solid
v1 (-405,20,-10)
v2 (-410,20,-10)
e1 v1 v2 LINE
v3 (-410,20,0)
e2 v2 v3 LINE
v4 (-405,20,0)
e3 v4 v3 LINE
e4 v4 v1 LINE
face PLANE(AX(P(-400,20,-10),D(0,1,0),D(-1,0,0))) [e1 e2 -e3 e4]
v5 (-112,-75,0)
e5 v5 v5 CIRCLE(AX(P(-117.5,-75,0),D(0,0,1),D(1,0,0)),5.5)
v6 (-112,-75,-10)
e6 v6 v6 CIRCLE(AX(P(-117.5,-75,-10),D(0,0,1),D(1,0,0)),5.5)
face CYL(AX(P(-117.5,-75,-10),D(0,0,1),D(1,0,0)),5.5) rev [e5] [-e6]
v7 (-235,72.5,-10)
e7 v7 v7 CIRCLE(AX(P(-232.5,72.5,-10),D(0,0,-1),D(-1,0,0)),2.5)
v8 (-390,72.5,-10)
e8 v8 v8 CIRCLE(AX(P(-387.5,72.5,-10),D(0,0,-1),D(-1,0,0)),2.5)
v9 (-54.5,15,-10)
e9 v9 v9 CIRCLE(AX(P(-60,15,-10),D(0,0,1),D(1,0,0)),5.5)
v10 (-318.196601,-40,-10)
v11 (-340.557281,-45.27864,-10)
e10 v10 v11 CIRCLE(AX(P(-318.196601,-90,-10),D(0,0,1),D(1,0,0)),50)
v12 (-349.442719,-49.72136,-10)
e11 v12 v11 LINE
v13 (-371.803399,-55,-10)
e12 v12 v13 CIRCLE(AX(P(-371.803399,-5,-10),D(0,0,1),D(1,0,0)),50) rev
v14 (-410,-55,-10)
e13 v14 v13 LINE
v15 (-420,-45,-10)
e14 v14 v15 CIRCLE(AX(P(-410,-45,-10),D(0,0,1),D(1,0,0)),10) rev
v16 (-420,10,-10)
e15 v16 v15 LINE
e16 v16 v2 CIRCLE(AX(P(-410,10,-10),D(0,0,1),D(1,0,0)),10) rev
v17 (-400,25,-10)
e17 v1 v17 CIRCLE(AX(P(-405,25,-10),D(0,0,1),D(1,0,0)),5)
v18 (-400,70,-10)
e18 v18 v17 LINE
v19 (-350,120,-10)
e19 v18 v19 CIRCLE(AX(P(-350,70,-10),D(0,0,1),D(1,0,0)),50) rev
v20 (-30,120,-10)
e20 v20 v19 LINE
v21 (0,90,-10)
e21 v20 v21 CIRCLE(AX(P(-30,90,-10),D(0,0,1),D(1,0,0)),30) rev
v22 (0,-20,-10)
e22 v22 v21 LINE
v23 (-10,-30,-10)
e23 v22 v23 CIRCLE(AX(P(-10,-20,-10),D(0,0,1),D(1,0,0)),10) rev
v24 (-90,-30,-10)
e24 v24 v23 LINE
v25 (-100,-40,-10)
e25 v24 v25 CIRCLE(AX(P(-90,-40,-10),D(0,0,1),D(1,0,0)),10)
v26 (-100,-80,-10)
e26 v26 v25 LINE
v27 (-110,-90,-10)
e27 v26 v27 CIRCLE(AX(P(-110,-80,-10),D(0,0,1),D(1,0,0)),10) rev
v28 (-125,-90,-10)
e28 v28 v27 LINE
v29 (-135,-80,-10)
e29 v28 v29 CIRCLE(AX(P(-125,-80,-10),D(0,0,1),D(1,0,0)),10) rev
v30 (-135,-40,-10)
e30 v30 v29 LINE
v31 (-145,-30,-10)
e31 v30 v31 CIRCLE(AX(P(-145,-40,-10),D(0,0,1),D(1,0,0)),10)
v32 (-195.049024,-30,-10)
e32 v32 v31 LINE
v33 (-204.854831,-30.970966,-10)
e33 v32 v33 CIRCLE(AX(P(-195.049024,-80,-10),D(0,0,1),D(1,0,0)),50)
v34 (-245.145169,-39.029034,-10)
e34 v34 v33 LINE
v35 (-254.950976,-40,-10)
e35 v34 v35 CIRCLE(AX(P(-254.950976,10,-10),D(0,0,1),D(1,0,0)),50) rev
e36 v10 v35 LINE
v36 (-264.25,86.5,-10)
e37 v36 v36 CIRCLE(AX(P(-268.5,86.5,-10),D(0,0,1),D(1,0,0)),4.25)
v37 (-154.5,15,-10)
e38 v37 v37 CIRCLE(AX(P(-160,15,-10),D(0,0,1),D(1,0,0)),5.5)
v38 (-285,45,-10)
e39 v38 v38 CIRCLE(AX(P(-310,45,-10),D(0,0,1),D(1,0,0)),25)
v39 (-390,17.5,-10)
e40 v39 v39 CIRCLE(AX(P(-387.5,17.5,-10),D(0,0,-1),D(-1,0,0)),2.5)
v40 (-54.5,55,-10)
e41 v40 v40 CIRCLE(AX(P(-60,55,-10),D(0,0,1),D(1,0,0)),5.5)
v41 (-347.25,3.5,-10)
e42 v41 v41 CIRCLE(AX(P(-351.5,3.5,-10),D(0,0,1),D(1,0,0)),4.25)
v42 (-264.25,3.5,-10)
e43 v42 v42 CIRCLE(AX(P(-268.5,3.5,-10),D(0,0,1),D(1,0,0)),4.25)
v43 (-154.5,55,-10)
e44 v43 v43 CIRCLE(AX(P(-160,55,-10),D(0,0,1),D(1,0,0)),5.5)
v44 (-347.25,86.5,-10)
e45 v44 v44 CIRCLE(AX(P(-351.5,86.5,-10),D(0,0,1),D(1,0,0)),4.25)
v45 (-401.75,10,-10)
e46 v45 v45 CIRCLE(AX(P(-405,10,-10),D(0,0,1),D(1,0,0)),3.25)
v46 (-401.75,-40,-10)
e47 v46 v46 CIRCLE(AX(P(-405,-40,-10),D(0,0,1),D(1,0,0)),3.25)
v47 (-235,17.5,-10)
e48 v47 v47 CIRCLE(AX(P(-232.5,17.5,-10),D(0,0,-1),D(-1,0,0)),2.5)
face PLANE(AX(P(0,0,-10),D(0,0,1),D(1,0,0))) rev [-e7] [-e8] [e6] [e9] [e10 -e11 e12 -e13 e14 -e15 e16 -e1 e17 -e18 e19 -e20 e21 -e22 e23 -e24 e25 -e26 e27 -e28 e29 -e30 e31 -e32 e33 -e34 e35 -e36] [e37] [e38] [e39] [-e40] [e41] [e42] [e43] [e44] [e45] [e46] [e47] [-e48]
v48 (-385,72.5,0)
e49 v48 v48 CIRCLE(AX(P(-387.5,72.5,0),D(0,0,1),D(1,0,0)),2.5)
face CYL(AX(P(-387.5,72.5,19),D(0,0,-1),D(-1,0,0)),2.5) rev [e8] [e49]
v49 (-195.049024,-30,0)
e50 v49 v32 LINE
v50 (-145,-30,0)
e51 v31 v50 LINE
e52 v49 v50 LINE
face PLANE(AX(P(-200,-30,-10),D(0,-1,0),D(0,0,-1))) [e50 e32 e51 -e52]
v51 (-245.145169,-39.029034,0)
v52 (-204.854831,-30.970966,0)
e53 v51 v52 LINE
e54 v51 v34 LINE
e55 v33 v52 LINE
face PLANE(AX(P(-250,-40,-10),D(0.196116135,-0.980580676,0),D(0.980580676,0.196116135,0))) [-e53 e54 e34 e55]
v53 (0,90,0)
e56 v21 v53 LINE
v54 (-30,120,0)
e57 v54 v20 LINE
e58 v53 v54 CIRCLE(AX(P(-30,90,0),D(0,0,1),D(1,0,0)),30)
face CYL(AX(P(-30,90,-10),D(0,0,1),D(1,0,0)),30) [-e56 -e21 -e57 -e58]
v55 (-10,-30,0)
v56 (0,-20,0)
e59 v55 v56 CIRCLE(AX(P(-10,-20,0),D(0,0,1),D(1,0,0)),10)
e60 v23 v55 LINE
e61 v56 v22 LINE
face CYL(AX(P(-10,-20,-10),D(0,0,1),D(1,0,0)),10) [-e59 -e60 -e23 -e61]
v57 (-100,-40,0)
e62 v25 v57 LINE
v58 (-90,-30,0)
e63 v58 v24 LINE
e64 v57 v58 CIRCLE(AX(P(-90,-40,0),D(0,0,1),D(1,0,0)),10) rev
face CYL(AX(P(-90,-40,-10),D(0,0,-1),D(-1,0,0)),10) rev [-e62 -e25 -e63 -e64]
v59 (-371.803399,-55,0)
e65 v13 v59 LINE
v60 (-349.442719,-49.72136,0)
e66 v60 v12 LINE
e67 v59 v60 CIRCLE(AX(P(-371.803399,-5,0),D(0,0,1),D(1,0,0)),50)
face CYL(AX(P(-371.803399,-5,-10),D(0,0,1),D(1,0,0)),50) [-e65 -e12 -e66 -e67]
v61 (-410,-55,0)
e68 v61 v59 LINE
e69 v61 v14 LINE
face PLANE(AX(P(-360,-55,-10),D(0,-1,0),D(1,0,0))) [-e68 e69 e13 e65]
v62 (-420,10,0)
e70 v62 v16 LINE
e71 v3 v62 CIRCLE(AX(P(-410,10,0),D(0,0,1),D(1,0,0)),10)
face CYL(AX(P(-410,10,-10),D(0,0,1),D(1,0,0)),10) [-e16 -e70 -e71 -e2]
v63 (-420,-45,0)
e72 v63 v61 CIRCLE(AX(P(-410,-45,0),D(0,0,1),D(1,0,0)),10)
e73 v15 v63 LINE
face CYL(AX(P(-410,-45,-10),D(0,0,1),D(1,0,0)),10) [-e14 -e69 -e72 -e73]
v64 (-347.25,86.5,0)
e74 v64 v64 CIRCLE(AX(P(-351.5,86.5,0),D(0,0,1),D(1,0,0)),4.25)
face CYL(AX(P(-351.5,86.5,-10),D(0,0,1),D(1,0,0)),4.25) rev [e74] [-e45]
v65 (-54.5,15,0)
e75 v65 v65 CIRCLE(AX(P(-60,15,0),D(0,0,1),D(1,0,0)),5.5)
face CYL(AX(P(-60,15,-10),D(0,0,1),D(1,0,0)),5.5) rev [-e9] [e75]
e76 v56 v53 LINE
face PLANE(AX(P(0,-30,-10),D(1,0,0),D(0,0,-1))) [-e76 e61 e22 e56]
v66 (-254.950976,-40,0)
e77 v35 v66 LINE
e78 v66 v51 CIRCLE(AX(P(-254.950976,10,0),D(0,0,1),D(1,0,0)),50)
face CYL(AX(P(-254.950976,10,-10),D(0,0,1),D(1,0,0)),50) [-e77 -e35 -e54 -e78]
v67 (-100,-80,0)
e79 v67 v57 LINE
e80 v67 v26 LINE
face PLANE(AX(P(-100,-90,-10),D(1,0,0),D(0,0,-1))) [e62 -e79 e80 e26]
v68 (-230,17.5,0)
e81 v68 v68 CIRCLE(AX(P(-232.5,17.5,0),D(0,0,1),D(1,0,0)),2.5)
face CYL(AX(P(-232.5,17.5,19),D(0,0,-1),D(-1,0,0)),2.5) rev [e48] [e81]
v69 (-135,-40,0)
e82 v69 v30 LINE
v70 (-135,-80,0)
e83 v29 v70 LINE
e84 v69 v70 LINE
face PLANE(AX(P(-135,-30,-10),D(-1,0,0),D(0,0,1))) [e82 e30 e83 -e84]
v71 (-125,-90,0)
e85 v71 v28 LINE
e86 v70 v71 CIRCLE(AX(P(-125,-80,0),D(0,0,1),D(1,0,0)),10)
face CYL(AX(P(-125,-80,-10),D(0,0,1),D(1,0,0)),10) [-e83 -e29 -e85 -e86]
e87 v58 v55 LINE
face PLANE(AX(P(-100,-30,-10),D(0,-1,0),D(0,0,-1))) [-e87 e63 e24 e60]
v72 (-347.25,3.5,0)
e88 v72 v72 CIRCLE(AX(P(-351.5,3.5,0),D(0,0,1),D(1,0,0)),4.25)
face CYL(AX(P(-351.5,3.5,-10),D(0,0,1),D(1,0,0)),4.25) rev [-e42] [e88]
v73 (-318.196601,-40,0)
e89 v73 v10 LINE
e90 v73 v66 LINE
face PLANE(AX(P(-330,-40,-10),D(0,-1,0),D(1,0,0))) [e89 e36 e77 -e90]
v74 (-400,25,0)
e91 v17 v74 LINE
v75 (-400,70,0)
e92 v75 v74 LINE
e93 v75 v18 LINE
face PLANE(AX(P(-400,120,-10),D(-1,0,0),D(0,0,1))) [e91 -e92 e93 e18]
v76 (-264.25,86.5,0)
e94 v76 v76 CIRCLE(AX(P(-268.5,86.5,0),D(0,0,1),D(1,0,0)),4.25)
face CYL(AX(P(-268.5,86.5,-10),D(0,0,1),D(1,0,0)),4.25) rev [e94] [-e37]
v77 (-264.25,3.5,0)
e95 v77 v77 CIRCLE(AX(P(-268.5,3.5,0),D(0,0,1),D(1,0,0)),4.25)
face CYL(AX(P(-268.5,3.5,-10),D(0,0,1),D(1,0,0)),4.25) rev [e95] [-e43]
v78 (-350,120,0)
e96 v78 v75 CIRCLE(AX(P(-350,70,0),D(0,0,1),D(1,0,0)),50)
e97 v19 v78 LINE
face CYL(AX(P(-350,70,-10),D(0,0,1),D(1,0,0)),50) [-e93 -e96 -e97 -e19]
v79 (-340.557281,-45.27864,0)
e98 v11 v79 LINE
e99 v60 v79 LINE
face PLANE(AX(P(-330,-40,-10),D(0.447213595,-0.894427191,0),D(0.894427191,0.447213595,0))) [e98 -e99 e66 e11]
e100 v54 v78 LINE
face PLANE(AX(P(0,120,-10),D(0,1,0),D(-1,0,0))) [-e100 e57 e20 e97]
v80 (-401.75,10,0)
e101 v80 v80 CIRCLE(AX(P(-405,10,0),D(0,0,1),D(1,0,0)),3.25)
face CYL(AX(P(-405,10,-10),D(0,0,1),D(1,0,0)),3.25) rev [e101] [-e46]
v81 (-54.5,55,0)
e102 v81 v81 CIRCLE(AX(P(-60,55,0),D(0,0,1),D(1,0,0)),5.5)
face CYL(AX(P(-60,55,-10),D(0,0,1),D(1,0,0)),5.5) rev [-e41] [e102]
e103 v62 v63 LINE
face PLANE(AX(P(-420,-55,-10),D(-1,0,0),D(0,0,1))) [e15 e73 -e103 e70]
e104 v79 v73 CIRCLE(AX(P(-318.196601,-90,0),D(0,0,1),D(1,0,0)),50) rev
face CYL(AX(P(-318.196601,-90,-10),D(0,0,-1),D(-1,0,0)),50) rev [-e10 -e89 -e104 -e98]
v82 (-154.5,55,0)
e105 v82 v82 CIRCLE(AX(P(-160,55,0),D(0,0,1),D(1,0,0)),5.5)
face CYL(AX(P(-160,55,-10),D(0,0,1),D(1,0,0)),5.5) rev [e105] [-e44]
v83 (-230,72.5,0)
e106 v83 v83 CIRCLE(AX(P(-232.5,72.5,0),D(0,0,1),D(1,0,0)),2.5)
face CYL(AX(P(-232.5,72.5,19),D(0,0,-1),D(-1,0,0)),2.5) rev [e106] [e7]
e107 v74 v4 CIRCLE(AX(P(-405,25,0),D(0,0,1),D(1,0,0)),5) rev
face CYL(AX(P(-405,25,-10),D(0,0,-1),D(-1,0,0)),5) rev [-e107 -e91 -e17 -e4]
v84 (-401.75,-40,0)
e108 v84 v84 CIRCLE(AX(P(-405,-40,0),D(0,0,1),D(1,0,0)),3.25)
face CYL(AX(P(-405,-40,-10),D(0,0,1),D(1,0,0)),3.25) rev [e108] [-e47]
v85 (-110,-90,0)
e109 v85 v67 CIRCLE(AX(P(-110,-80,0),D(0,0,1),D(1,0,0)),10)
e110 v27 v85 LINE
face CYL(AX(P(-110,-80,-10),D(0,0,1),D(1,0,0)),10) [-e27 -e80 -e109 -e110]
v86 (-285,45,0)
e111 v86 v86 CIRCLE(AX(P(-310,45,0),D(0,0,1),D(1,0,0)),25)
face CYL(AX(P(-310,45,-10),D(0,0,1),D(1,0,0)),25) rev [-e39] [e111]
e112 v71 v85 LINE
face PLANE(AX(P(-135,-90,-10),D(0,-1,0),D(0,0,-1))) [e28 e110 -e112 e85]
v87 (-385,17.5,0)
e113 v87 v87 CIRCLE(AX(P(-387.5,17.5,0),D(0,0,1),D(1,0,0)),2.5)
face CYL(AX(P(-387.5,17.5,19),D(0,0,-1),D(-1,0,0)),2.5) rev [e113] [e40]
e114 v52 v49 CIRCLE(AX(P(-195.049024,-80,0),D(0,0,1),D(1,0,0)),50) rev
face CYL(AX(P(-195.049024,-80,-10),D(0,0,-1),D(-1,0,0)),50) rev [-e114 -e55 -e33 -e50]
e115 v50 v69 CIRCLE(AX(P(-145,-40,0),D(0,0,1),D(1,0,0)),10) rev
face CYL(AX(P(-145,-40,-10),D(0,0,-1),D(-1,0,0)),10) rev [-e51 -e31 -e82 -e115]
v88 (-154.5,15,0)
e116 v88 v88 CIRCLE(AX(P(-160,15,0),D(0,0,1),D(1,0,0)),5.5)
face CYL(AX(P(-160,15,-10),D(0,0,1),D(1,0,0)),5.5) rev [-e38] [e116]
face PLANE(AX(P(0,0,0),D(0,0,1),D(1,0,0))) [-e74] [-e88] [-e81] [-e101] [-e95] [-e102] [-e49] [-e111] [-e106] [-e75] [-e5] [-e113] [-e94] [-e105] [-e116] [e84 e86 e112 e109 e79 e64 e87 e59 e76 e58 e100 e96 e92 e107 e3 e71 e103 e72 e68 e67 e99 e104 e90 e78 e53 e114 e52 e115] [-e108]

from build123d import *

# Parameters (mm, degrees)
TABAN_FLAN_1_DEPTH    = 10
IZIM2_R               = 25
IZIM2_R_2             = 4.25
IZIM2_R_3             = 5.5
IZIM2_R_4             = 3.25
KES_EKSTR_ZYON1_DEPTH = 10
RADYUS2_R             = 50
RADYUS3_R             = 30
RADYUS4_R             = 10
RADYUS5_R             = 50
RADYUS6_R             = 10
RADYUS7_R             = 5
IZIM3_R               = 2.5
KES_EKSTR_ZYON2_DEPTH = 29


# Sheet-metal steps are written as plain solids
with BuildPart() as part:
    # Çizim1 → Taban-Flanş1 (new body)
    with BuildSketch(Plane.XY):
        Polygon((0, 120), (-400, 120), (-400, 20), (-420, 20), (-420, -55), (-360, -55), (-330, -40), (-250, -40), (-200, -30), (-135, -30), (-135, -90), (-100, -90), (-100, -30), (0, -30), (0, 0), align=None)
    extrude(amount=-TABAN_FLAN_1_DEPTH)

    # Çizim2 → Kes-Ekstrüzyon1 (cut)
    with BuildSketch(Plane.XY):
        with Locations((-310, 45)):
            Circle(IZIM2_R)
        with Locations((-351.5, 86.5)):
            Circle(IZIM2_R_2)
        with Locations((-268.5, 86.5)):
            Circle(IZIM2_R_2)
        with Locations((-351.5, 3.5)):
            Circle(IZIM2_R_2)
        with Locations((-268.5, 3.5)):
            Circle(IZIM2_R_2)
        with Locations((-60, 55)):
            Circle(IZIM2_R_3)
        with Locations((-160, 55)):
            Circle(IZIM2_R_3)
        with Locations((-160, 15)):
            Circle(IZIM2_R_3)
        with Locations((-60, 15)):
            Circle(IZIM2_R_3)
        with Locations((-117.5, -75)):
            Circle(IZIM2_R_3)
        with Locations((-405, 10)):
            Circle(IZIM2_R_4)
        with Locations((-405, -40)):
            Circle(IZIM2_R_4)
    extrude(amount=-KES_EKSTR_ZYON1_DEPTH, mode=Mode.SUBTRACT)

    # Radyus2
    radyus2_edges = [part.edges().sort_by_distance(p)[0] for p in [
        (-400, 120, -5),
    ]]
    fillet(radyus2_edges, radius=RADYUS2_R)

    # Radyus3
    radyus3_edges = [part.edges().sort_by_distance(p)[0] for p in [
        (0, 120, -5),
    ]]
    fillet(radyus3_edges, radius=RADYUS3_R)

    # Radyus4
    radyus4_edges = [part.edges().sort_by_distance(p)[0] for p in [
        (0, -30, -5),
        (-100, -30, -5),
        (-100, -90, -5),
        (-135, -90, -5),
        (-135, -30, -5),
    ]]
    fillet(radyus4_edges, radius=RADYUS4_R)

    # Radyus5
    radyus5_edges = [part.edges().sort_by_distance(p)[0] for p in [
        (-200, -30, -5),
        (-250, -40, -5),
        (-330, -40, -5),
        (-360, -55, -5),
    ]]
    fillet(radyus5_edges, radius=RADYUS5_R)

    # Radyus6
    radyus6_edges = [part.edges().sort_by_distance(p)[0] for p in [
        (-420, -55, -5),
        (-420, 20, -5),
    ]]
    fillet(radyus6_edges, radius=RADYUS6_R)

    # Radyus7
    radyus7_edges = [part.edges().sort_by_distance(p)[0] for p in [
        (-400, 20, -5),
    ]]
    fillet(radyus7_edges, radius=RADYUS7_R)

    # Çizim3 → Kes-Ekstrüzyon2 (cut)
    with BuildSketch(Plane(origin=(0, 0, -10), x_dir=(-1, 0, 0), z_dir=(0, 0, -1))):
        with Locations((232.5, 72.5)):
            Circle(IZIM3_R)
        with Locations((232.5, 17.5)):
            Circle(IZIM3_R)
        with Locations((387.5, 17.5)):
            Circle(IZIM3_R)
        with Locations((387.5, 72.5)):
            Circle(IZIM3_R)
    extrude(amount=-KES_EKSTR_ZYON2_DEPTH, mode=Mode.SUBTRACT)


solid = part.part
